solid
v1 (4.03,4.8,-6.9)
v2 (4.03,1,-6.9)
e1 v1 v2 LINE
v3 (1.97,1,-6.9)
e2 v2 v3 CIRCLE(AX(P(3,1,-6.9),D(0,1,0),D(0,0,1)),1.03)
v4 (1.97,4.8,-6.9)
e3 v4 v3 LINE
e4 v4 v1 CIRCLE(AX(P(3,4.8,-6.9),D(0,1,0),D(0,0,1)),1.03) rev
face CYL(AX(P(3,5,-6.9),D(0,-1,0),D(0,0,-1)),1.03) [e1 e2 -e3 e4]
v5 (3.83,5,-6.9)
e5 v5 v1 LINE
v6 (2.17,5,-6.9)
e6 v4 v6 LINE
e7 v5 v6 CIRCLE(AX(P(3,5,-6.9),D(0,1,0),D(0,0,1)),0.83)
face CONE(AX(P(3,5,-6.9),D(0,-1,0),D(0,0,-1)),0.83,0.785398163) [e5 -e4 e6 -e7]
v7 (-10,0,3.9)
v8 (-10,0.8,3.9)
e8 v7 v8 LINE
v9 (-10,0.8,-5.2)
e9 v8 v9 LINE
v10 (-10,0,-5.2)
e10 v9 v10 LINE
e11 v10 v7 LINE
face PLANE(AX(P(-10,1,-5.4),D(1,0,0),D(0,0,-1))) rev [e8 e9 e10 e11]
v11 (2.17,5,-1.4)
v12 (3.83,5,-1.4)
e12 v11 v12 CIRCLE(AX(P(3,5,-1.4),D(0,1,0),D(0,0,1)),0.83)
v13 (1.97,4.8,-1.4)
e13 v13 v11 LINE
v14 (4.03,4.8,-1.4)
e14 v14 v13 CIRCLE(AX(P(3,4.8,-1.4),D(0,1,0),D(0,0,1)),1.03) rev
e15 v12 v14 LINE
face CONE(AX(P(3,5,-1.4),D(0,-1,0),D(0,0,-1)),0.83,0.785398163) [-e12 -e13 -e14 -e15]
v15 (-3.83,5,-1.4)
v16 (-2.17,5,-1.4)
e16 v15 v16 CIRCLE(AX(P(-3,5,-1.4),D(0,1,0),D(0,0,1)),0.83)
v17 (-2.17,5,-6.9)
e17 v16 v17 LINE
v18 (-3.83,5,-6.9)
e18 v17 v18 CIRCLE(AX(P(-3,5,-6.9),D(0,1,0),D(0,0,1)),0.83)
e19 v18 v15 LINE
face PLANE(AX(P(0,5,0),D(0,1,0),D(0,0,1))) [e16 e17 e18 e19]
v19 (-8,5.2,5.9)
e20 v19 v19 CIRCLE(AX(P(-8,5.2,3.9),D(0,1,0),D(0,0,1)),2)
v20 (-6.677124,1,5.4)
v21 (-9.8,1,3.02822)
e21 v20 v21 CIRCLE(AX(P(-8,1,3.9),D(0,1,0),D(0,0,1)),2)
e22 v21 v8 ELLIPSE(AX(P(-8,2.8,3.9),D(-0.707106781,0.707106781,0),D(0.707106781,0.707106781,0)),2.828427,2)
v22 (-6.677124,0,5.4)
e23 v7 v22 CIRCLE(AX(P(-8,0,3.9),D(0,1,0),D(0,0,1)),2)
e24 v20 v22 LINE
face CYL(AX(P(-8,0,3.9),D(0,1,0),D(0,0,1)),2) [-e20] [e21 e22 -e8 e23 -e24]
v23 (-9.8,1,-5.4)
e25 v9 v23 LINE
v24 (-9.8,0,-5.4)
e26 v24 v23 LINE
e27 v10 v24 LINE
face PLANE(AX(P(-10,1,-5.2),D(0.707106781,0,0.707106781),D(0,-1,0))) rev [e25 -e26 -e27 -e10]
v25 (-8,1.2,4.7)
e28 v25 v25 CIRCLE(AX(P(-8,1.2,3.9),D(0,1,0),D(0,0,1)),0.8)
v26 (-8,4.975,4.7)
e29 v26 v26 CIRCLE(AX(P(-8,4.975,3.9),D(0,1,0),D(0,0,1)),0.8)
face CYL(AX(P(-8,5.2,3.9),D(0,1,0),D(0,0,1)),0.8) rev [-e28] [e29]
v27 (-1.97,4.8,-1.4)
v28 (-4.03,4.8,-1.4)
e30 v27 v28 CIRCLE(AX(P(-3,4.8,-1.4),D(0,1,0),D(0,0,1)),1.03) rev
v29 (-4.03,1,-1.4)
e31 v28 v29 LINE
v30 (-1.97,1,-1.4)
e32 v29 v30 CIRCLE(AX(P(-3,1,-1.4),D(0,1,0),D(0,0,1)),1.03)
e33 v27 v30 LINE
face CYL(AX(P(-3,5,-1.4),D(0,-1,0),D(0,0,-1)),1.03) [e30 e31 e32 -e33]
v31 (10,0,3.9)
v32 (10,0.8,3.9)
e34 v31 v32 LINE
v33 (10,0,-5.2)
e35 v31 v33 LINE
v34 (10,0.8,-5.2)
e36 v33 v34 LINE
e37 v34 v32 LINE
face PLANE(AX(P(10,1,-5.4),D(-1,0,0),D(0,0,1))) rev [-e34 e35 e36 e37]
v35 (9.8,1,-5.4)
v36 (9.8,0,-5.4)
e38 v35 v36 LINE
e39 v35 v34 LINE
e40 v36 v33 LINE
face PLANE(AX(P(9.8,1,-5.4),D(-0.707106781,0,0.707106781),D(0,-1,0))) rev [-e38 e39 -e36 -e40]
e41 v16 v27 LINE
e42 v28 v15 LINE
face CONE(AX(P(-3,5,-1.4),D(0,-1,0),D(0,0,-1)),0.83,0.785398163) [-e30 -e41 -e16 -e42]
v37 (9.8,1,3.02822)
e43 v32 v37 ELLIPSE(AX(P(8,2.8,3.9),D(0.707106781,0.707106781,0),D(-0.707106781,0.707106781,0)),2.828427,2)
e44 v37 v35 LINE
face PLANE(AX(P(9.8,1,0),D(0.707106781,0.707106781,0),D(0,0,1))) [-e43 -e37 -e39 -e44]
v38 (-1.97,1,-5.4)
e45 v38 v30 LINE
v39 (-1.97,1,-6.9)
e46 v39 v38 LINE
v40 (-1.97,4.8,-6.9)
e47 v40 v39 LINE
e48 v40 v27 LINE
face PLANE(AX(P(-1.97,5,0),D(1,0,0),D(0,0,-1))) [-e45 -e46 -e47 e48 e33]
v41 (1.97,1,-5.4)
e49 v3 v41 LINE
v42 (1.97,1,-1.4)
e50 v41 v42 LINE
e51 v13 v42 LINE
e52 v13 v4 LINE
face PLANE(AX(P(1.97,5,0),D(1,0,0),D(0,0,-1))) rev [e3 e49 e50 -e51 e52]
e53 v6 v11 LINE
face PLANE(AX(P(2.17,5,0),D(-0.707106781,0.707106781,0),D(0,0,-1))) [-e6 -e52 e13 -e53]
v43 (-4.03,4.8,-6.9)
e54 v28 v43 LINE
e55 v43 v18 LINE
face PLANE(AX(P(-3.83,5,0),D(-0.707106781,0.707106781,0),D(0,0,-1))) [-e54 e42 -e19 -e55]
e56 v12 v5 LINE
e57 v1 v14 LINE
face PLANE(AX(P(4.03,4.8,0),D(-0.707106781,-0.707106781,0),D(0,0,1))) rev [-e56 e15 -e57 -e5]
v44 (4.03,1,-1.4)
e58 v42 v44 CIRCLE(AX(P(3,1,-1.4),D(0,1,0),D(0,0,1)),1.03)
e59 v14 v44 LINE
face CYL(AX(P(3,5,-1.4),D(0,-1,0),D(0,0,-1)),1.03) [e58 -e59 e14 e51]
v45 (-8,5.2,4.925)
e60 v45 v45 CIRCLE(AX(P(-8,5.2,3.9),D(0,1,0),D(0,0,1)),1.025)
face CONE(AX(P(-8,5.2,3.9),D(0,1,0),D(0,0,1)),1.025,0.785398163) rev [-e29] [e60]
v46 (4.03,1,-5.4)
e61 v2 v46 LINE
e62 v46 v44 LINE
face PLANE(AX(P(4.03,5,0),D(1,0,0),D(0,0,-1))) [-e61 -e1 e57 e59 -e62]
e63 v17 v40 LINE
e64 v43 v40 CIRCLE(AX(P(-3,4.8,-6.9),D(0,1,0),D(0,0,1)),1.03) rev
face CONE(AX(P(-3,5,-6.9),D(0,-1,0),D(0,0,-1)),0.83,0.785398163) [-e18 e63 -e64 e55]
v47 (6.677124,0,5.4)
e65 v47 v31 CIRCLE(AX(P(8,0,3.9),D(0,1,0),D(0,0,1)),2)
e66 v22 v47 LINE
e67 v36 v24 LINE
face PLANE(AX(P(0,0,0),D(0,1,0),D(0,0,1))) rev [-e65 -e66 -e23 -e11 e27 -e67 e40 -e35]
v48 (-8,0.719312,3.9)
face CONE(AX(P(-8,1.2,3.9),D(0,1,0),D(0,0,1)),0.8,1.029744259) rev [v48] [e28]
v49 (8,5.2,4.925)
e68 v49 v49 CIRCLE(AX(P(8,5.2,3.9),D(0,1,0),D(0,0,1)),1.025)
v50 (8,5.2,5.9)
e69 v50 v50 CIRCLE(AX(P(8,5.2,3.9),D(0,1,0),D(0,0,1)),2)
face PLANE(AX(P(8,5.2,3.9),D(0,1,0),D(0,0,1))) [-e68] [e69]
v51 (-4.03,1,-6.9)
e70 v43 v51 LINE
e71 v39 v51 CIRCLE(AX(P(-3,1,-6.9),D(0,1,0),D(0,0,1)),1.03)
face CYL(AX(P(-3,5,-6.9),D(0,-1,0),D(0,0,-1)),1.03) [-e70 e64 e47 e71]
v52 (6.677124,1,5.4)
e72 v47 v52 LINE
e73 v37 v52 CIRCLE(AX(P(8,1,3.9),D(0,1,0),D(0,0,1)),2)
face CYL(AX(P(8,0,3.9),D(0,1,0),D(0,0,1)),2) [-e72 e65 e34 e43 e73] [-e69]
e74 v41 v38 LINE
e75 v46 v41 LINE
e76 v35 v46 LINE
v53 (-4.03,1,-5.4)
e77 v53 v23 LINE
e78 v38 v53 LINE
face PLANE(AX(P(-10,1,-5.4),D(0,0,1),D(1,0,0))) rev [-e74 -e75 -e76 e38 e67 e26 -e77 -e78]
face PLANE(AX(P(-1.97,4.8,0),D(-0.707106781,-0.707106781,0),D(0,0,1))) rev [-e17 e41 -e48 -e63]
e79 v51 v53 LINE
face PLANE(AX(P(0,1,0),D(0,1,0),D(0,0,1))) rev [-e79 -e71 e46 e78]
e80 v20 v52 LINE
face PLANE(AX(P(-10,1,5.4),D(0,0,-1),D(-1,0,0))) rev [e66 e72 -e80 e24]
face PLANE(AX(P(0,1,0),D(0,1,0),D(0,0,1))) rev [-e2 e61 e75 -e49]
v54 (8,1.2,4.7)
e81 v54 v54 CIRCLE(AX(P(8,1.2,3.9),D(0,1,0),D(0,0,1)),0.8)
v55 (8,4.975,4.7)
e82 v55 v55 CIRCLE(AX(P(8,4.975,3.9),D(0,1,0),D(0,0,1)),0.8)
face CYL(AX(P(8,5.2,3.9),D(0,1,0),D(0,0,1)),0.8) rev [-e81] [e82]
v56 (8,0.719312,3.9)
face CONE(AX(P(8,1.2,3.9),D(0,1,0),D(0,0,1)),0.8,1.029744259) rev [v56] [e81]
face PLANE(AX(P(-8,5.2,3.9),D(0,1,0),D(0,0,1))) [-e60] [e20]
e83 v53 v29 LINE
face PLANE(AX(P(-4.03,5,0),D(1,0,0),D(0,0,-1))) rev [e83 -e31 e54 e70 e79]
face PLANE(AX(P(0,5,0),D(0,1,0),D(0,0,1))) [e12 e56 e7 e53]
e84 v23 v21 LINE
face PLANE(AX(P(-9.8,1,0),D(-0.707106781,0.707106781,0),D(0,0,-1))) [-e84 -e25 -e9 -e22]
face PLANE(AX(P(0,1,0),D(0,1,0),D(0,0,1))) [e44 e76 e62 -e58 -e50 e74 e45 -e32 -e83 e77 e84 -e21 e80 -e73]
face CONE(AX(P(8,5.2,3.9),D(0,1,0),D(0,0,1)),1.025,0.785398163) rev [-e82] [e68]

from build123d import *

# Parameters (mm, degrees)
EXTRUDE_1_DEPTH              = 1
EXTRUDE_3_DEPTH              = 4.2
EXTRUDE_3_DEPTH_BACK         = 1
SKETCH_5_R                   = 2.0000000000000004
SKETCH_5_R_2                 = 1.9999999999999996
SKETCH_7_R                   = 1.0299999999999991
EXTRUDE_4_DEPTH              = 4
HOLE_WIZARD_M2_1_D           = 1.6
HOLE_WIZARD_M2_1_DEPTH       = 4
HOLE_WIZARD_M2_1_CSINK_D     = 2.05
HOLE_WIZARD_M2_1_CSINK_ANGLE = 90
HOLE_WIZARD_M2_1_TIP         = 0.48068849522204826
CUT_EXTRUDE_1_DEPTH          = 14.435955492632447
CHAMFER_1_SIZE               = 0.2
CHAMFER_2_SIZE               = 0.2


with BuildPart() as part:
    # 草图1 → 凸台-拉伸1 (new body)
    with BuildSketch(Plane(origin=(0, 0, 0), x_dir=(1, 0, 0), z_dir=(0, 1, 0))):
        Polygon((-10.000000000000002, 5.4), (9.999999999999998, 5.4), (9.999999999999998, -5.4), (-10, -5.4), align=None)
    extrude(amount=EXTRUDE_1_DEPTH)

    # 草图5 → 凸台-拉伸3 (add, two sides: drawn at the far end of the back side and taken through both)
    with BuildSketch(Plane(origin=(0, 1, 0), x_dir=(1, 0, 0), z_dir=(0, 1, 0)).offset(-EXTRUDE_3_DEPTH_BACK)):
        with Locations(Location((-8.000000000000002, -3.900000000000001, 0), (0, 0, 270))):
            Circle(SKETCH_5_R)
        with Locations(Location((7.999999999999998, -3.900000000000001, 0), (0, 0, 270))):
            Circle(SKETCH_5_R_2)
    extrude(amount=EXTRUDE_3_DEPTH + EXTRUDE_3_DEPTH_BACK)

    # 草图7 → 凸台-拉伸4 (add)
    with BuildSketch(Plane(origin=(0, 1, 0), x_dir=(1, 0, 0), z_dir=(0, 1, 0))):
        with BuildLine():
            Line((-1.9700000000000024, 5.4), (-4.030000000000003, 5.4))
            Line((-4.030000000000002, 5.4), (-4.030000000000001, 1.3999999999999986))
            ThreePointArc((-4.030000000000002, 1.3999999999999988), (-3.0000000000000018, 2.429999999999999), (-1.9700000000000017, 1.3999999999999986))
            Line((-1.9700000000000017, 1.3999999999999986), (-1.9700000000000022, 5.4))
        make_face()
        with BuildLine():
            ThreePointArc((-1.9700000000000017, 1.3999999999999986), (-3.0000000000000018, 2.429999999999999), (-4.030000000000002, 1.3999999999999988))
            Line((-4.030000000000001, 1.3999999999999986), (-1.9700000000000015, 1.3999999999999986))
        make_face()
        with BuildLine():
            Line((-1.9700000000000015, 1.3999999999999986), (-4.030000000000001, 1.3999999999999986))
            ThreePointArc((-4.030000000000002, 1.3999999999999988), (-3.0000000000000018, 0.36999999999999855), (-1.9700000000000017, 1.3999999999999984))
        make_face()
        with BuildLine():
            Line((4.029999999999997, 5.4), (1.9699999999999989, 5.4))
            Line((1.9699999999999989, 5.4), (1.9700000000000004, 1.4000000000000021))
            ThreePointArc((1.9699999999999973, 1.400000000000002), (2.9999999999999982, 2.4300000000000024), (4.029999999999999, 1.4000000000000017))
            Line((4.029999999999997, 1.4000000000000021), (4.029999999999997, 5.4))
        make_face()
        with BuildLine():
            ThreePointArc((4.029999999999999, 1.4000000000000017), (2.9999999999999982, 2.4300000000000024), (1.9699999999999973, 1.400000000000002))
            Line((1.9700000000000004, 1.4000000000000015), (4.029999999999997, 1.400000000000002))
        make_face()
        with BuildLine():
            Line((4.029999999999997, 1.400000000000002), (1.9700000000000004, 1.4000000000000015))
            ThreePointArc((1.9699999999999973, 1.400000000000002), (2.9999999999999982, 0.3700000000000008), (4.029999999999999, 1.4000000000000015))
        make_face()
        with BuildLine():
            ThreePointArc((-1.9700000000000022, 6.8999999999999995), (-3.0000000000000013, 5.87), (-4.03, 6.8999999999999995))
            Line((-4.030000000000002, 6.8999999999999995), (-4.030000000000002, 5.4))
            Line((-4.030000000000003, 5.4), (-1.9700000000000024, 5.4))
            Line((-1.9700000000000022, 5.4), (-1.9700000000000024, 6.8999999999999995))
        make_face()
        with Locations((-3.0000000000000013, 6.8999999999999995)):
            Circle(SKETCH_7_R)
        with BuildLine():
            Line((1.9699999999999982, 6.899999999999999), (1.9699999999999989, 5.4))
            Line((1.9699999999999989, 5.4), (4.029999999999997, 5.4))
            Line((4.029999999999997, 5.4), (4.029999999999997, 6.8999999999999995))
            ThreePointArc((4.029999999999998, 6.8999999999999995), (2.9999999999999982, 5.87), (1.969999999999999, 6.8999999999999995))
        make_face()
        with Locations((2.9999999999999982, 6.8999999999999995)):
            Circle(SKETCH_7_R)
    extrude(amount=EXTRUDE_4_DEPTH)

    # M2 螺纹孔1
    with Locations(Plane(origin=(0, 5.200000000000001, 0), x_dir=(1, 0, 0), z_dir=(0, 1, 0))):
        with Locations((-8, -3.9), (8, -3.9)):
            CounterSinkHole(HOLE_WIZARD_M2_1_D / 2, HOLE_WIZARD_M2_1_CSINK_D / 2, depth=HOLE_WIZARD_M2_1_DEPTH, counter_sink_angle=HOLE_WIZARD_M2_1_CSINK_ANGLE)
            with Locations((0, 0, -(HOLE_WIZARD_M2_1_DEPTH + HOLE_WIZARD_M2_1_TIP / 2))):  # 118° drill point
                Cone(0, HOLE_WIZARD_M2_1_D / 2, HOLE_WIZARD_M2_1_TIP, mode=Mode.SUBTRACT)

    # 草图10 → 切除-拉伸1 (cut, through all)
    with BuildSketch(Plane(origin=(0, 1, 0), x_dir=(1, 0, 0), z_dir=(0, 1, 0))):
        with BuildLine():
            Line((-10.000000000000002, -5.3999999999999995), (-9.322875655532316, -5.3999999999999995))
            ThreePointArc((-9.322875655532314, -5.399999999999986), (-9.822875655532302, -4.722875655532286), (-10.000000000000002, -3.9000000000000004))
            Line((-10.000000000000002, -3.900000000000002), (-10.000000000000002, -5.3999999999999995))
        make_face()
        with BuildLine():
            Line((9.322875655532266, -5.3999999999999995), (9.999999999999998, -5.3999999999999995))
            Line((9.999999999999998, -5.3999999999999995), (9.999999999999998, -3.900000000000001))
            ThreePointArc((9.999999999999998, -3.9000000000000012), (9.822875655532286, -4.7228756555323095), (9.322875655532272, -5.400000000000019))
        make_face()
    extrude(amount=-CUT_EXTRUDE_1_DEPTH, mode=Mode.SUBTRACT)

    # 倒角1
    # the kernel refuses this chamfer: 0.2 mm, written as the material it takes off along each edge
    with BuildSketch(Plane(origin=(-10, 1, 4.414336597593362), x_dir=(-0.02749587661058736, -0.9996219169112966, 0), z_dir=(-1.6e-16, 0, -1))) as chamfer_1_piece_1_section:
        Polygon((CHAMFER_1_SIZE * 0.999621916911, -CHAMFER_1_SIZE * 0.0274958766106), (-CHAMFER_1_SIZE * 0.0274958766106, -CHAMFER_1_SIZE * 0.999621916911), (0, 0), align=None)
    chamfer_1_piece_1 = extrude(amount=10.328673195186546, mode=Mode.PRIVATE)
    chamfer_1_piece_1 = chamfer_1_piece_1 - Plane(origin=(-8.000000000000002, 0.9330678370118787, 3.900000000000001), x_dir=(-1.8e-16, 0, 1), z_dir=(0, -1, 0)) * Cylinder(2.0000000000000004, 22, mode=Mode.PRIVATE)
    add(chamfer_1_piece_1, mode=Mode.SUBTRACT)
    with BuildSketch(Plane(origin=(9.999999999999998, 1, -5.9143365975931825), x_dir=(0.02749587661058736, -0.9996219169112966, 0), z_dir=(0, 0, 1))) as chamfer_1_piece_2_section:
        Polygon((CHAMFER_1_SIZE * 0.999621916911, -CHAMFER_1_SIZE * 0.0274958766106), (-CHAMFER_1_SIZE * 0.0274958766106, -CHAMFER_1_SIZE * 0.999621916911), (0, 0), align=None)
    chamfer_1_piece_2 = extrude(amount=10.328673195185887, mode=Mode.PRIVATE)
    chamfer_1_piece_2 = chamfer_1_piece_2 - Plane(origin=(7.999999999999998, 0.9330678369662879, 3.900000000000001), x_dir=(-1.8e-16, 0, 1), z_dir=(0, -1, 0)) * Cylinder(1.9999999999999996, 22, mode=Mode.PRIVATE)
    add(chamfer_1_piece_2, mode=Mode.SUBTRACT)
    with BuildSketch(Plane(origin=(-10.000000000000002, -0.5143365975931808, -5.4), x_dir=(0.9996219169112966, 0, -0.02749587661058742), z_dir=(0, 1, 0))) as chamfer_1_piece_3:
        Polygon((CHAMFER_1_SIZE * 0.999621916911, -CHAMFER_1_SIZE * 0.0274958766106), (-CHAMFER_1_SIZE * 0.0274958766106, -CHAMFER_1_SIZE * 0.999621916911), (0, 0), align=None)
    extrude(amount=2.0286731951863617, mode=Mode.SUBTRACT)
    with BuildSketch(Plane(origin=(9.999999999999998, -0.5143365975931831, -5.4), x_dir=(-0.9996219169112966, 0, -0.02749587661058742), z_dir=(0, 1, 0))) as chamfer_1_piece_4:
        Polygon((CHAMFER_1_SIZE * 0.999621916911, CHAMFER_1_SIZE * 0.0274958766106), (-CHAMFER_1_SIZE * 0.0274958766106, CHAMFER_1_SIZE * 0.999621916911), (0, 0), align=None)
    extrude(amount=2.028673195186366, mode=Mode.SUBTRACT)

    # 倒角2
    chamfer_2_edges = [part.edges().sort_by_distance(p)[0] for p in [
        (-1.970000000000002, 5, -4.149999999999999),
        (-4.030000000000001, 5, -4.149999999999999),
        (-3.000000000000002, 5, -0.3699999999999988),
        (-3.0000000000000013, 5, -7.929999999999999),
        (4.029999999999998, 5, -4.15),
        (1.9699999999999986, 5, -4.15),
        (2.999999999999998, 5, -0.3700000000000008),
        (2.9999999999999982, 5, -7.929999999999999),
    ]]
    chamfer(chamfer_2_edges, length=CHAMFER_2_SIZE)


solid = part.part
